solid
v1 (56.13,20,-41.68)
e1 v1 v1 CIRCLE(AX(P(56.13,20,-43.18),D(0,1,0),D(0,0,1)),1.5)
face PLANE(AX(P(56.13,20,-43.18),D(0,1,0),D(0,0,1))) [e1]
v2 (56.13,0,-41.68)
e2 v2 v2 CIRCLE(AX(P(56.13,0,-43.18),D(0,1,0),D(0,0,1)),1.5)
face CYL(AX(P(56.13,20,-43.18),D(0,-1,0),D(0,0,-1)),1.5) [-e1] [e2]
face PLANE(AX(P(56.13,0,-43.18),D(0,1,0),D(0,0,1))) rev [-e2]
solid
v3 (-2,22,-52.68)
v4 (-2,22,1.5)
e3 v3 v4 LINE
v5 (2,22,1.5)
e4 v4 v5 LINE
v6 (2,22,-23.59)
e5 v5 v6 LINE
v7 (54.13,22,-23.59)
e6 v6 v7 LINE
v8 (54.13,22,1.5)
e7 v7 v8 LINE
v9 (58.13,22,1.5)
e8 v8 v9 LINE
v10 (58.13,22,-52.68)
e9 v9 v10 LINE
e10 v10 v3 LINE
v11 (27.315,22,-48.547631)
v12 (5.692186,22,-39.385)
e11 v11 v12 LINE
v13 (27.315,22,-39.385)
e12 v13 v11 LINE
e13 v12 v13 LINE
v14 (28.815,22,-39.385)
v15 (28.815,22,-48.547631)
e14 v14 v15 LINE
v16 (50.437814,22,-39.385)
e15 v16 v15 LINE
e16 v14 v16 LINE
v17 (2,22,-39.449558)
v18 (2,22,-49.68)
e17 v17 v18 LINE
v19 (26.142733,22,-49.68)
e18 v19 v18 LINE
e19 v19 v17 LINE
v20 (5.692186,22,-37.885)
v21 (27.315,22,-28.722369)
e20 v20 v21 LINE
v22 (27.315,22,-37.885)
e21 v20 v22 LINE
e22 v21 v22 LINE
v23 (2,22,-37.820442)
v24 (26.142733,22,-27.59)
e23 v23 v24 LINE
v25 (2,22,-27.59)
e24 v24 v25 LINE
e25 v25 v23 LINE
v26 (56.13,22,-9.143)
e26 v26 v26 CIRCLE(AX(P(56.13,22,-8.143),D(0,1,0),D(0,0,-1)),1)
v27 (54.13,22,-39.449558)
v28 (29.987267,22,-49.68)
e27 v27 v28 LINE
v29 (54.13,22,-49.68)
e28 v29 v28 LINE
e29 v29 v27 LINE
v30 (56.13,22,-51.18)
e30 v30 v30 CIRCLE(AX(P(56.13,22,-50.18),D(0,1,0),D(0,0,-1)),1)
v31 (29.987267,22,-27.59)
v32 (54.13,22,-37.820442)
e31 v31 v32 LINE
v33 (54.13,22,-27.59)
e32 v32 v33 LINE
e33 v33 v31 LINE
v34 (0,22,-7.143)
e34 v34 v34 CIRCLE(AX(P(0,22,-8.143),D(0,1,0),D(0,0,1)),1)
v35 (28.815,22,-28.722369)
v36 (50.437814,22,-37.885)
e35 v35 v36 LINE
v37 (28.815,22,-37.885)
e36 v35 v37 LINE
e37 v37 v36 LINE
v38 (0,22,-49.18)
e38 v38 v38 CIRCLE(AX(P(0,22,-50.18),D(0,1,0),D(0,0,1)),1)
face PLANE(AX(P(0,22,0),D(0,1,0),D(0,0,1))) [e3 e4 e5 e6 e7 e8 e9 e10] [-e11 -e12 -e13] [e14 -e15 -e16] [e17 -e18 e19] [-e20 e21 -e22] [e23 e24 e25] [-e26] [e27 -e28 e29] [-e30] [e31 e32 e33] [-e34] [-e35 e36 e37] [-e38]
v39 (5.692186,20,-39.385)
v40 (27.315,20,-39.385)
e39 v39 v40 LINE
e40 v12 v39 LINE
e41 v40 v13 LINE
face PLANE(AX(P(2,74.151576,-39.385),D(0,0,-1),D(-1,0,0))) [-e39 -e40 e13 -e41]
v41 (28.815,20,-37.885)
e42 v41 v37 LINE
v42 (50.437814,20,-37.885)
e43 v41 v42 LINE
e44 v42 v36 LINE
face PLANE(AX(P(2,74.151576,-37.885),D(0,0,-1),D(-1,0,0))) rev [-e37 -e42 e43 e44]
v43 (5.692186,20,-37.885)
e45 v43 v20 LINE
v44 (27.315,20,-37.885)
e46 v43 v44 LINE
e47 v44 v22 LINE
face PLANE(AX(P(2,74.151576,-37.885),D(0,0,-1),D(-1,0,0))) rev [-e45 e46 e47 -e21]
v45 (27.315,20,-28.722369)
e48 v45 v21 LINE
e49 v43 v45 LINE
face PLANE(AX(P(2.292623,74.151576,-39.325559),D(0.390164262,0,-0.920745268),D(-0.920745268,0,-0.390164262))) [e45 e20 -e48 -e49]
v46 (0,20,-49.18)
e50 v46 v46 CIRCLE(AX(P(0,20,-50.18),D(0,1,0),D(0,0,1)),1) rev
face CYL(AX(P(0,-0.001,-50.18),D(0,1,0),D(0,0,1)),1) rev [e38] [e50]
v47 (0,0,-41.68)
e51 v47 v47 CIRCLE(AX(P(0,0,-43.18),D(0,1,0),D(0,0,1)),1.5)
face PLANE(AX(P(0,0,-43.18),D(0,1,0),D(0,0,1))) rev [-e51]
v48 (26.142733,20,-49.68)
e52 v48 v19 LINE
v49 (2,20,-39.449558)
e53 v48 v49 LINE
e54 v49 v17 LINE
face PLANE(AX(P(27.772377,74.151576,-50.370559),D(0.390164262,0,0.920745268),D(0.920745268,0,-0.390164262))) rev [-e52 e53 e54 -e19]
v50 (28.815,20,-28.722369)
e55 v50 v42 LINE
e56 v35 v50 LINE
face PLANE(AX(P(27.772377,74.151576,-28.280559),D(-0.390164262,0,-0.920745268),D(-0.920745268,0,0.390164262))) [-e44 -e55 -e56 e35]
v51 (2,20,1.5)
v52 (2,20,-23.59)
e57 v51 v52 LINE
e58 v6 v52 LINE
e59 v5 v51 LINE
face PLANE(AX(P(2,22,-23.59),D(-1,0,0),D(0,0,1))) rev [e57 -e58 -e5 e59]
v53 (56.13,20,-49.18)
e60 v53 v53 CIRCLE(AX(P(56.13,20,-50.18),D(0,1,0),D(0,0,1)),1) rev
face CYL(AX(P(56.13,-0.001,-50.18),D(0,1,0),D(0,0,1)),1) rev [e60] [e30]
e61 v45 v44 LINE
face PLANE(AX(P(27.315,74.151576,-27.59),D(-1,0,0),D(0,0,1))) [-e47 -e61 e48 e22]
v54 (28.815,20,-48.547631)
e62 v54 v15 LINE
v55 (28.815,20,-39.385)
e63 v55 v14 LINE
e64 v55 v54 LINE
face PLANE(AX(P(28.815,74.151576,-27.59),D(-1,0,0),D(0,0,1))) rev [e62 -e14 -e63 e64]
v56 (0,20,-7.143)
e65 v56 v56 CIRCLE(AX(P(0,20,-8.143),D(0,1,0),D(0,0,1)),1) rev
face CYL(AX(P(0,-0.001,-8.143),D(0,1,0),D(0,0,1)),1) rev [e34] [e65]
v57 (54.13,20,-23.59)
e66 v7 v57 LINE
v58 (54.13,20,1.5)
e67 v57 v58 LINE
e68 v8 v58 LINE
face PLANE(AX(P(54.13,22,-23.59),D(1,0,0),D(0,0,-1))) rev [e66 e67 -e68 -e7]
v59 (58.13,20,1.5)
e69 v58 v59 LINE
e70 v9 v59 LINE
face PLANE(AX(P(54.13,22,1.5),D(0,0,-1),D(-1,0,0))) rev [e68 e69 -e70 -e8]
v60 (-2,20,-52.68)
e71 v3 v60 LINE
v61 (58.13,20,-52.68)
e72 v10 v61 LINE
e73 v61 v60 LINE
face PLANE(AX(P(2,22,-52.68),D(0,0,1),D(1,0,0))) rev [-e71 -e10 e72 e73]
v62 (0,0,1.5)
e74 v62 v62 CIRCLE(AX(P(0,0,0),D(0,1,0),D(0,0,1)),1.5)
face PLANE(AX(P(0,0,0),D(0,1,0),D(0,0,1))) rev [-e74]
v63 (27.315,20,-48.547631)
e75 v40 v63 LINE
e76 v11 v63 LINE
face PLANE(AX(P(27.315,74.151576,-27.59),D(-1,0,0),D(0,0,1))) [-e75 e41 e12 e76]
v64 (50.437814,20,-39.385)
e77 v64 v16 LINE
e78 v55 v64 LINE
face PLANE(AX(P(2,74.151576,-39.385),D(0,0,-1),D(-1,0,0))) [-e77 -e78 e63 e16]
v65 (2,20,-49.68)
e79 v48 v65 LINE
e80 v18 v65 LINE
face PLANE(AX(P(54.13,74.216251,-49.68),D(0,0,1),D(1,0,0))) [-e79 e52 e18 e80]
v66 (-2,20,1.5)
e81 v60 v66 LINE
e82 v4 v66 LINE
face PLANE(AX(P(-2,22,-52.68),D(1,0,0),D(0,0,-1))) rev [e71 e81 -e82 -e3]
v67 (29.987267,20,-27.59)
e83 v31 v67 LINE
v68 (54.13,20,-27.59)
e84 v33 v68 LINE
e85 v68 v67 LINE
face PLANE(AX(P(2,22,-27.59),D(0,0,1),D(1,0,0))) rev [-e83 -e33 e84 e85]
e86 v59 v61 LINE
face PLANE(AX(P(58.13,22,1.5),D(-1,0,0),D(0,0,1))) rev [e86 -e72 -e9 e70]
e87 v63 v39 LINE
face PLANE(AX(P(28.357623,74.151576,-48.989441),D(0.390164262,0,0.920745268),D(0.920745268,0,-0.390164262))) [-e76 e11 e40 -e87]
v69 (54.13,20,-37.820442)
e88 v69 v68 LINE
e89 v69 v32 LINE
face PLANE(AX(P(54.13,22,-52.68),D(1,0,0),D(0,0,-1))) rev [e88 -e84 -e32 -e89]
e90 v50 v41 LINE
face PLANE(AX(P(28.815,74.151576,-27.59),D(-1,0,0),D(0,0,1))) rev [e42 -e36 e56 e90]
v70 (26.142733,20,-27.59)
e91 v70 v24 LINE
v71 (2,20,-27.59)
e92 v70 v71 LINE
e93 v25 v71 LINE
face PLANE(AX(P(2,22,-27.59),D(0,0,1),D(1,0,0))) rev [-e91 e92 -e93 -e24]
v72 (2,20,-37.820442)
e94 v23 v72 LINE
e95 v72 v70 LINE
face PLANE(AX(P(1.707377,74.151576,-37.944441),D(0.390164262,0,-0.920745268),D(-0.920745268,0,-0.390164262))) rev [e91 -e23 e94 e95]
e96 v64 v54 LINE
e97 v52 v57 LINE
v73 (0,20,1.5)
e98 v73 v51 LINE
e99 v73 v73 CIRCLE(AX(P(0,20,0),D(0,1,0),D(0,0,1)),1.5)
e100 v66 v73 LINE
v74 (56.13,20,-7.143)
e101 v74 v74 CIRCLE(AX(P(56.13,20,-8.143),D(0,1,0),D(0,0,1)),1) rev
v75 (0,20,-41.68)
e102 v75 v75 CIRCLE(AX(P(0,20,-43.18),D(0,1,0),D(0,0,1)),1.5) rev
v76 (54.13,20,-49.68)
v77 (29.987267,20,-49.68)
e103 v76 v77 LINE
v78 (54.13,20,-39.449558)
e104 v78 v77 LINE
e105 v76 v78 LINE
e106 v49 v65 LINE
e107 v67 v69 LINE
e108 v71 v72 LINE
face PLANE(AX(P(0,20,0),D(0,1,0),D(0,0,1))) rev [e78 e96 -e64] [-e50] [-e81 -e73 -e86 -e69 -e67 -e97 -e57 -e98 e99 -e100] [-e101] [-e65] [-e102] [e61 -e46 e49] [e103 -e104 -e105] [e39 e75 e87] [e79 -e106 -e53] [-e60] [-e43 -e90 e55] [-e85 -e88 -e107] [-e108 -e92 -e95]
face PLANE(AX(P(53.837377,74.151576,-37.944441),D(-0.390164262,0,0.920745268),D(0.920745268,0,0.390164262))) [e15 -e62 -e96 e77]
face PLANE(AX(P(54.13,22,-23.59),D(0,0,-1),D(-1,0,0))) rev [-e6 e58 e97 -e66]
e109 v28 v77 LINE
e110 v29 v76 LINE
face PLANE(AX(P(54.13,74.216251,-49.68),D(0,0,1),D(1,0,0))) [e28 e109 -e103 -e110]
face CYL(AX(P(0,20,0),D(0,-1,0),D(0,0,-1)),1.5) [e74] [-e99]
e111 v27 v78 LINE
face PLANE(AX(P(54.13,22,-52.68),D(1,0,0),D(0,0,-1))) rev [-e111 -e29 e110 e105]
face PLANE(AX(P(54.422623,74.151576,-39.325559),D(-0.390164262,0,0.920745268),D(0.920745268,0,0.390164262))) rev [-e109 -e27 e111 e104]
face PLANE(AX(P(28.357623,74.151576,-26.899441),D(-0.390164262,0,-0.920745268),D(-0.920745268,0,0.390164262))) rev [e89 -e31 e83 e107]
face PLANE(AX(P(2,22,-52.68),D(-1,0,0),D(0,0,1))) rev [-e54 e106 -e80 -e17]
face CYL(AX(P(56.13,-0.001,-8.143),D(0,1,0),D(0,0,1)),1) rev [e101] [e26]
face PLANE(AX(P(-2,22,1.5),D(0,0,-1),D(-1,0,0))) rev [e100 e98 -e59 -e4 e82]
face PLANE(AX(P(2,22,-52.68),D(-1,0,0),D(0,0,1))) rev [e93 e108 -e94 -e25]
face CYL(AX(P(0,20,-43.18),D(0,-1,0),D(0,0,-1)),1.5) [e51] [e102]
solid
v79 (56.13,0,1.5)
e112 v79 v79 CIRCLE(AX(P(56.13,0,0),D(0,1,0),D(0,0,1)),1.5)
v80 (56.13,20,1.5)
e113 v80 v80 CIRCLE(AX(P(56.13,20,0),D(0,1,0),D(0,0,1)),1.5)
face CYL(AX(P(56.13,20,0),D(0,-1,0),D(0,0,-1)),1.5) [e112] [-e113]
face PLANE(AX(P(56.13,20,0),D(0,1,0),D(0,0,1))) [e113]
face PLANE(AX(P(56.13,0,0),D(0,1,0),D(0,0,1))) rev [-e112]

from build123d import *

# Parameters (mm, degrees)
SKETCH_1_R          = 1.5
EXTRUDE_1_DEPTH     = 20
EXTRUDE_1_2_DEPTH   = 20
EXTRUDE_1_3_DEPTH   = 20
EXTRUDE_1_4_DEPTH   = 20
EXTRUDE_2_DEPTH     = 2
SKETCH_4_R          = 1
CUT_EXTRUDE_1_DEPTH = 2
SKETCH_5_W          = 52.13
SKETCH_5_H          = 3
EXTRUDE_3_DEPTH     = 2
EXTRUDE_START       = -2
EXTRUDE_3_2_DEPTH   = 2


# Read off the part's stored shape, not the designer's step: 拉伸-薄壁3
with BuildPart() as part:
    # 草图1 → 凸台-拉伸1 (new body)
    with BuildSketch(Plane(origin=(0, 0, 0), x_dir=(1, 0, 0), z_dir=(0, 1, 0))):
        with Locations(Location((0, 0, 0), (0, 0, 270))):
            Circle(SKETCH_1_R)
    extrude(amount=EXTRUDE_1_DEPTH)



with BuildPart() as body_2:
    # 草图1 → Extrude 1 2 (new body)
    with BuildSketch(Plane(origin=(0, 0, 0), x_dir=(1, 0, 0), z_dir=(0, 1, 0))):
        with Locations(Location((0, 43.18, 0), (0, 0, 270))):
            Circle(SKETCH_1_R)
    extrude(amount=EXTRUDE_1_2_DEPTH)


with BuildPart() as body_3:
    # 草图1 → Extrude 1 3 (new body)
    with BuildSketch(Plane(origin=(0, 0, 0), x_dir=(1, 0, 0), z_dir=(0, 1, 0))):
        with Locations(Location((56.13, 43.18, 0), (0, 0, 270))):
            Circle(SKETCH_1_R)
    extrude(amount=EXTRUDE_1_3_DEPTH)


with BuildPart() as body_4:
    # 草图1 → Extrude 1 4 (new body)
    with BuildSketch(Plane(origin=(0, 0, 0), x_dir=(1, 0, 0), z_dir=(0, 1, 0))):
        with Locations(Location((56.13, 0, 0), (0, 0, 270))):
            Circle(SKETCH_1_R)
    extrude(amount=EXTRUDE_1_4_DEPTH)


with BuildPart() as part_1:
    add(part.part)

    add(body_2.part)  # 凸台-拉伸2 merges body 2
    # 草图2 → 凸台-拉伸2 (add)
    with BuildSketch(Plane(origin=(0, 20, 0), x_dir=(1, 0, 0), z_dir=(0, 1, 0))):
        Polygon((-2, 52.68), (-2, -1.5), (2, -1.5), (2, 23.59), (54.13, 23.59), (54.13, -1.5), (58.13, -1.5), (58.13, 52.68), (54.13, 52.68), (54.13, 27.59), (2, 27.59), (2, 52.68), align=None)
    extrude(amount=EXTRUDE_2_DEPTH)

    # 草图4 → 切除-拉伸1 (cut)
    with BuildSketch(Plane(origin=(0, 22, 0), x_dir=(1, 0, 0), z_dir=(0, 1, 0))):
        with Locations(Location((0, 50.18, 0), (0, 0, 270))):
            Circle(SKETCH_4_R)
        with Locations(Location((0, 8.143, 0), (0, 0, 270))):
            Circle(SKETCH_4_R)
        with Locations(Location((56.13, 8.143, 0), (0, 0, 270))):
            Circle(SKETCH_4_R)
        with Locations(Location((56.13, 50.18, 0), (0, 0, 270))):
            Circle(SKETCH_4_R)
    extrude(amount=-CUT_EXTRUDE_1_DEPTH, mode=Mode.SUBTRACT)

    # 草图5 → Extrude 3 (add)
    with BuildSketch(Plane.XZ.offset(-20)):
        with Locations((28.065, -51.18)):
            Rectangle(SKETCH_5_W, SKETCH_5_H)
    extrude(amount=-EXTRUDE_3_DEPTH)

    # Extrude 3 2 outline → Extrude 3 2 (add)
    with BuildSketch(Plane.XZ.offset(-20).offset(EXTRUDE_START)):
        Polygon((26.142732706, -27.59), (2, -37.820442461), (2, -39.449557539), (26.142732706, -49.68), (29.987267294, -49.68), (54.13, -39.449557539), (54.13, -37.820442461), (29.987267294, -27.59), align=None)
        Polygon((27.315, -48.547631219), (5.692185809, -39.385), (27.315, -39.385), align=None, mode=Mode.SUBTRACT)
        Polygon((28.815, -39.385), (50.437814191, -39.385), (28.815, -48.547631219), align=None, mode=Mode.SUBTRACT)
        Polygon((27.315, -37.885), (5.692185809, -37.885), (27.315, -28.722368781), align=None, mode=Mode.SUBTRACT)
        Polygon((28.815, -37.885), (28.815, -28.722368781), (50.437814191, -37.885), align=None, mode=Mode.SUBTRACT)
    extrude(amount=EXTRUDE_3_2_DEPTH)


solid = Compound([body_3.part, body_4.part, part_1.part])
